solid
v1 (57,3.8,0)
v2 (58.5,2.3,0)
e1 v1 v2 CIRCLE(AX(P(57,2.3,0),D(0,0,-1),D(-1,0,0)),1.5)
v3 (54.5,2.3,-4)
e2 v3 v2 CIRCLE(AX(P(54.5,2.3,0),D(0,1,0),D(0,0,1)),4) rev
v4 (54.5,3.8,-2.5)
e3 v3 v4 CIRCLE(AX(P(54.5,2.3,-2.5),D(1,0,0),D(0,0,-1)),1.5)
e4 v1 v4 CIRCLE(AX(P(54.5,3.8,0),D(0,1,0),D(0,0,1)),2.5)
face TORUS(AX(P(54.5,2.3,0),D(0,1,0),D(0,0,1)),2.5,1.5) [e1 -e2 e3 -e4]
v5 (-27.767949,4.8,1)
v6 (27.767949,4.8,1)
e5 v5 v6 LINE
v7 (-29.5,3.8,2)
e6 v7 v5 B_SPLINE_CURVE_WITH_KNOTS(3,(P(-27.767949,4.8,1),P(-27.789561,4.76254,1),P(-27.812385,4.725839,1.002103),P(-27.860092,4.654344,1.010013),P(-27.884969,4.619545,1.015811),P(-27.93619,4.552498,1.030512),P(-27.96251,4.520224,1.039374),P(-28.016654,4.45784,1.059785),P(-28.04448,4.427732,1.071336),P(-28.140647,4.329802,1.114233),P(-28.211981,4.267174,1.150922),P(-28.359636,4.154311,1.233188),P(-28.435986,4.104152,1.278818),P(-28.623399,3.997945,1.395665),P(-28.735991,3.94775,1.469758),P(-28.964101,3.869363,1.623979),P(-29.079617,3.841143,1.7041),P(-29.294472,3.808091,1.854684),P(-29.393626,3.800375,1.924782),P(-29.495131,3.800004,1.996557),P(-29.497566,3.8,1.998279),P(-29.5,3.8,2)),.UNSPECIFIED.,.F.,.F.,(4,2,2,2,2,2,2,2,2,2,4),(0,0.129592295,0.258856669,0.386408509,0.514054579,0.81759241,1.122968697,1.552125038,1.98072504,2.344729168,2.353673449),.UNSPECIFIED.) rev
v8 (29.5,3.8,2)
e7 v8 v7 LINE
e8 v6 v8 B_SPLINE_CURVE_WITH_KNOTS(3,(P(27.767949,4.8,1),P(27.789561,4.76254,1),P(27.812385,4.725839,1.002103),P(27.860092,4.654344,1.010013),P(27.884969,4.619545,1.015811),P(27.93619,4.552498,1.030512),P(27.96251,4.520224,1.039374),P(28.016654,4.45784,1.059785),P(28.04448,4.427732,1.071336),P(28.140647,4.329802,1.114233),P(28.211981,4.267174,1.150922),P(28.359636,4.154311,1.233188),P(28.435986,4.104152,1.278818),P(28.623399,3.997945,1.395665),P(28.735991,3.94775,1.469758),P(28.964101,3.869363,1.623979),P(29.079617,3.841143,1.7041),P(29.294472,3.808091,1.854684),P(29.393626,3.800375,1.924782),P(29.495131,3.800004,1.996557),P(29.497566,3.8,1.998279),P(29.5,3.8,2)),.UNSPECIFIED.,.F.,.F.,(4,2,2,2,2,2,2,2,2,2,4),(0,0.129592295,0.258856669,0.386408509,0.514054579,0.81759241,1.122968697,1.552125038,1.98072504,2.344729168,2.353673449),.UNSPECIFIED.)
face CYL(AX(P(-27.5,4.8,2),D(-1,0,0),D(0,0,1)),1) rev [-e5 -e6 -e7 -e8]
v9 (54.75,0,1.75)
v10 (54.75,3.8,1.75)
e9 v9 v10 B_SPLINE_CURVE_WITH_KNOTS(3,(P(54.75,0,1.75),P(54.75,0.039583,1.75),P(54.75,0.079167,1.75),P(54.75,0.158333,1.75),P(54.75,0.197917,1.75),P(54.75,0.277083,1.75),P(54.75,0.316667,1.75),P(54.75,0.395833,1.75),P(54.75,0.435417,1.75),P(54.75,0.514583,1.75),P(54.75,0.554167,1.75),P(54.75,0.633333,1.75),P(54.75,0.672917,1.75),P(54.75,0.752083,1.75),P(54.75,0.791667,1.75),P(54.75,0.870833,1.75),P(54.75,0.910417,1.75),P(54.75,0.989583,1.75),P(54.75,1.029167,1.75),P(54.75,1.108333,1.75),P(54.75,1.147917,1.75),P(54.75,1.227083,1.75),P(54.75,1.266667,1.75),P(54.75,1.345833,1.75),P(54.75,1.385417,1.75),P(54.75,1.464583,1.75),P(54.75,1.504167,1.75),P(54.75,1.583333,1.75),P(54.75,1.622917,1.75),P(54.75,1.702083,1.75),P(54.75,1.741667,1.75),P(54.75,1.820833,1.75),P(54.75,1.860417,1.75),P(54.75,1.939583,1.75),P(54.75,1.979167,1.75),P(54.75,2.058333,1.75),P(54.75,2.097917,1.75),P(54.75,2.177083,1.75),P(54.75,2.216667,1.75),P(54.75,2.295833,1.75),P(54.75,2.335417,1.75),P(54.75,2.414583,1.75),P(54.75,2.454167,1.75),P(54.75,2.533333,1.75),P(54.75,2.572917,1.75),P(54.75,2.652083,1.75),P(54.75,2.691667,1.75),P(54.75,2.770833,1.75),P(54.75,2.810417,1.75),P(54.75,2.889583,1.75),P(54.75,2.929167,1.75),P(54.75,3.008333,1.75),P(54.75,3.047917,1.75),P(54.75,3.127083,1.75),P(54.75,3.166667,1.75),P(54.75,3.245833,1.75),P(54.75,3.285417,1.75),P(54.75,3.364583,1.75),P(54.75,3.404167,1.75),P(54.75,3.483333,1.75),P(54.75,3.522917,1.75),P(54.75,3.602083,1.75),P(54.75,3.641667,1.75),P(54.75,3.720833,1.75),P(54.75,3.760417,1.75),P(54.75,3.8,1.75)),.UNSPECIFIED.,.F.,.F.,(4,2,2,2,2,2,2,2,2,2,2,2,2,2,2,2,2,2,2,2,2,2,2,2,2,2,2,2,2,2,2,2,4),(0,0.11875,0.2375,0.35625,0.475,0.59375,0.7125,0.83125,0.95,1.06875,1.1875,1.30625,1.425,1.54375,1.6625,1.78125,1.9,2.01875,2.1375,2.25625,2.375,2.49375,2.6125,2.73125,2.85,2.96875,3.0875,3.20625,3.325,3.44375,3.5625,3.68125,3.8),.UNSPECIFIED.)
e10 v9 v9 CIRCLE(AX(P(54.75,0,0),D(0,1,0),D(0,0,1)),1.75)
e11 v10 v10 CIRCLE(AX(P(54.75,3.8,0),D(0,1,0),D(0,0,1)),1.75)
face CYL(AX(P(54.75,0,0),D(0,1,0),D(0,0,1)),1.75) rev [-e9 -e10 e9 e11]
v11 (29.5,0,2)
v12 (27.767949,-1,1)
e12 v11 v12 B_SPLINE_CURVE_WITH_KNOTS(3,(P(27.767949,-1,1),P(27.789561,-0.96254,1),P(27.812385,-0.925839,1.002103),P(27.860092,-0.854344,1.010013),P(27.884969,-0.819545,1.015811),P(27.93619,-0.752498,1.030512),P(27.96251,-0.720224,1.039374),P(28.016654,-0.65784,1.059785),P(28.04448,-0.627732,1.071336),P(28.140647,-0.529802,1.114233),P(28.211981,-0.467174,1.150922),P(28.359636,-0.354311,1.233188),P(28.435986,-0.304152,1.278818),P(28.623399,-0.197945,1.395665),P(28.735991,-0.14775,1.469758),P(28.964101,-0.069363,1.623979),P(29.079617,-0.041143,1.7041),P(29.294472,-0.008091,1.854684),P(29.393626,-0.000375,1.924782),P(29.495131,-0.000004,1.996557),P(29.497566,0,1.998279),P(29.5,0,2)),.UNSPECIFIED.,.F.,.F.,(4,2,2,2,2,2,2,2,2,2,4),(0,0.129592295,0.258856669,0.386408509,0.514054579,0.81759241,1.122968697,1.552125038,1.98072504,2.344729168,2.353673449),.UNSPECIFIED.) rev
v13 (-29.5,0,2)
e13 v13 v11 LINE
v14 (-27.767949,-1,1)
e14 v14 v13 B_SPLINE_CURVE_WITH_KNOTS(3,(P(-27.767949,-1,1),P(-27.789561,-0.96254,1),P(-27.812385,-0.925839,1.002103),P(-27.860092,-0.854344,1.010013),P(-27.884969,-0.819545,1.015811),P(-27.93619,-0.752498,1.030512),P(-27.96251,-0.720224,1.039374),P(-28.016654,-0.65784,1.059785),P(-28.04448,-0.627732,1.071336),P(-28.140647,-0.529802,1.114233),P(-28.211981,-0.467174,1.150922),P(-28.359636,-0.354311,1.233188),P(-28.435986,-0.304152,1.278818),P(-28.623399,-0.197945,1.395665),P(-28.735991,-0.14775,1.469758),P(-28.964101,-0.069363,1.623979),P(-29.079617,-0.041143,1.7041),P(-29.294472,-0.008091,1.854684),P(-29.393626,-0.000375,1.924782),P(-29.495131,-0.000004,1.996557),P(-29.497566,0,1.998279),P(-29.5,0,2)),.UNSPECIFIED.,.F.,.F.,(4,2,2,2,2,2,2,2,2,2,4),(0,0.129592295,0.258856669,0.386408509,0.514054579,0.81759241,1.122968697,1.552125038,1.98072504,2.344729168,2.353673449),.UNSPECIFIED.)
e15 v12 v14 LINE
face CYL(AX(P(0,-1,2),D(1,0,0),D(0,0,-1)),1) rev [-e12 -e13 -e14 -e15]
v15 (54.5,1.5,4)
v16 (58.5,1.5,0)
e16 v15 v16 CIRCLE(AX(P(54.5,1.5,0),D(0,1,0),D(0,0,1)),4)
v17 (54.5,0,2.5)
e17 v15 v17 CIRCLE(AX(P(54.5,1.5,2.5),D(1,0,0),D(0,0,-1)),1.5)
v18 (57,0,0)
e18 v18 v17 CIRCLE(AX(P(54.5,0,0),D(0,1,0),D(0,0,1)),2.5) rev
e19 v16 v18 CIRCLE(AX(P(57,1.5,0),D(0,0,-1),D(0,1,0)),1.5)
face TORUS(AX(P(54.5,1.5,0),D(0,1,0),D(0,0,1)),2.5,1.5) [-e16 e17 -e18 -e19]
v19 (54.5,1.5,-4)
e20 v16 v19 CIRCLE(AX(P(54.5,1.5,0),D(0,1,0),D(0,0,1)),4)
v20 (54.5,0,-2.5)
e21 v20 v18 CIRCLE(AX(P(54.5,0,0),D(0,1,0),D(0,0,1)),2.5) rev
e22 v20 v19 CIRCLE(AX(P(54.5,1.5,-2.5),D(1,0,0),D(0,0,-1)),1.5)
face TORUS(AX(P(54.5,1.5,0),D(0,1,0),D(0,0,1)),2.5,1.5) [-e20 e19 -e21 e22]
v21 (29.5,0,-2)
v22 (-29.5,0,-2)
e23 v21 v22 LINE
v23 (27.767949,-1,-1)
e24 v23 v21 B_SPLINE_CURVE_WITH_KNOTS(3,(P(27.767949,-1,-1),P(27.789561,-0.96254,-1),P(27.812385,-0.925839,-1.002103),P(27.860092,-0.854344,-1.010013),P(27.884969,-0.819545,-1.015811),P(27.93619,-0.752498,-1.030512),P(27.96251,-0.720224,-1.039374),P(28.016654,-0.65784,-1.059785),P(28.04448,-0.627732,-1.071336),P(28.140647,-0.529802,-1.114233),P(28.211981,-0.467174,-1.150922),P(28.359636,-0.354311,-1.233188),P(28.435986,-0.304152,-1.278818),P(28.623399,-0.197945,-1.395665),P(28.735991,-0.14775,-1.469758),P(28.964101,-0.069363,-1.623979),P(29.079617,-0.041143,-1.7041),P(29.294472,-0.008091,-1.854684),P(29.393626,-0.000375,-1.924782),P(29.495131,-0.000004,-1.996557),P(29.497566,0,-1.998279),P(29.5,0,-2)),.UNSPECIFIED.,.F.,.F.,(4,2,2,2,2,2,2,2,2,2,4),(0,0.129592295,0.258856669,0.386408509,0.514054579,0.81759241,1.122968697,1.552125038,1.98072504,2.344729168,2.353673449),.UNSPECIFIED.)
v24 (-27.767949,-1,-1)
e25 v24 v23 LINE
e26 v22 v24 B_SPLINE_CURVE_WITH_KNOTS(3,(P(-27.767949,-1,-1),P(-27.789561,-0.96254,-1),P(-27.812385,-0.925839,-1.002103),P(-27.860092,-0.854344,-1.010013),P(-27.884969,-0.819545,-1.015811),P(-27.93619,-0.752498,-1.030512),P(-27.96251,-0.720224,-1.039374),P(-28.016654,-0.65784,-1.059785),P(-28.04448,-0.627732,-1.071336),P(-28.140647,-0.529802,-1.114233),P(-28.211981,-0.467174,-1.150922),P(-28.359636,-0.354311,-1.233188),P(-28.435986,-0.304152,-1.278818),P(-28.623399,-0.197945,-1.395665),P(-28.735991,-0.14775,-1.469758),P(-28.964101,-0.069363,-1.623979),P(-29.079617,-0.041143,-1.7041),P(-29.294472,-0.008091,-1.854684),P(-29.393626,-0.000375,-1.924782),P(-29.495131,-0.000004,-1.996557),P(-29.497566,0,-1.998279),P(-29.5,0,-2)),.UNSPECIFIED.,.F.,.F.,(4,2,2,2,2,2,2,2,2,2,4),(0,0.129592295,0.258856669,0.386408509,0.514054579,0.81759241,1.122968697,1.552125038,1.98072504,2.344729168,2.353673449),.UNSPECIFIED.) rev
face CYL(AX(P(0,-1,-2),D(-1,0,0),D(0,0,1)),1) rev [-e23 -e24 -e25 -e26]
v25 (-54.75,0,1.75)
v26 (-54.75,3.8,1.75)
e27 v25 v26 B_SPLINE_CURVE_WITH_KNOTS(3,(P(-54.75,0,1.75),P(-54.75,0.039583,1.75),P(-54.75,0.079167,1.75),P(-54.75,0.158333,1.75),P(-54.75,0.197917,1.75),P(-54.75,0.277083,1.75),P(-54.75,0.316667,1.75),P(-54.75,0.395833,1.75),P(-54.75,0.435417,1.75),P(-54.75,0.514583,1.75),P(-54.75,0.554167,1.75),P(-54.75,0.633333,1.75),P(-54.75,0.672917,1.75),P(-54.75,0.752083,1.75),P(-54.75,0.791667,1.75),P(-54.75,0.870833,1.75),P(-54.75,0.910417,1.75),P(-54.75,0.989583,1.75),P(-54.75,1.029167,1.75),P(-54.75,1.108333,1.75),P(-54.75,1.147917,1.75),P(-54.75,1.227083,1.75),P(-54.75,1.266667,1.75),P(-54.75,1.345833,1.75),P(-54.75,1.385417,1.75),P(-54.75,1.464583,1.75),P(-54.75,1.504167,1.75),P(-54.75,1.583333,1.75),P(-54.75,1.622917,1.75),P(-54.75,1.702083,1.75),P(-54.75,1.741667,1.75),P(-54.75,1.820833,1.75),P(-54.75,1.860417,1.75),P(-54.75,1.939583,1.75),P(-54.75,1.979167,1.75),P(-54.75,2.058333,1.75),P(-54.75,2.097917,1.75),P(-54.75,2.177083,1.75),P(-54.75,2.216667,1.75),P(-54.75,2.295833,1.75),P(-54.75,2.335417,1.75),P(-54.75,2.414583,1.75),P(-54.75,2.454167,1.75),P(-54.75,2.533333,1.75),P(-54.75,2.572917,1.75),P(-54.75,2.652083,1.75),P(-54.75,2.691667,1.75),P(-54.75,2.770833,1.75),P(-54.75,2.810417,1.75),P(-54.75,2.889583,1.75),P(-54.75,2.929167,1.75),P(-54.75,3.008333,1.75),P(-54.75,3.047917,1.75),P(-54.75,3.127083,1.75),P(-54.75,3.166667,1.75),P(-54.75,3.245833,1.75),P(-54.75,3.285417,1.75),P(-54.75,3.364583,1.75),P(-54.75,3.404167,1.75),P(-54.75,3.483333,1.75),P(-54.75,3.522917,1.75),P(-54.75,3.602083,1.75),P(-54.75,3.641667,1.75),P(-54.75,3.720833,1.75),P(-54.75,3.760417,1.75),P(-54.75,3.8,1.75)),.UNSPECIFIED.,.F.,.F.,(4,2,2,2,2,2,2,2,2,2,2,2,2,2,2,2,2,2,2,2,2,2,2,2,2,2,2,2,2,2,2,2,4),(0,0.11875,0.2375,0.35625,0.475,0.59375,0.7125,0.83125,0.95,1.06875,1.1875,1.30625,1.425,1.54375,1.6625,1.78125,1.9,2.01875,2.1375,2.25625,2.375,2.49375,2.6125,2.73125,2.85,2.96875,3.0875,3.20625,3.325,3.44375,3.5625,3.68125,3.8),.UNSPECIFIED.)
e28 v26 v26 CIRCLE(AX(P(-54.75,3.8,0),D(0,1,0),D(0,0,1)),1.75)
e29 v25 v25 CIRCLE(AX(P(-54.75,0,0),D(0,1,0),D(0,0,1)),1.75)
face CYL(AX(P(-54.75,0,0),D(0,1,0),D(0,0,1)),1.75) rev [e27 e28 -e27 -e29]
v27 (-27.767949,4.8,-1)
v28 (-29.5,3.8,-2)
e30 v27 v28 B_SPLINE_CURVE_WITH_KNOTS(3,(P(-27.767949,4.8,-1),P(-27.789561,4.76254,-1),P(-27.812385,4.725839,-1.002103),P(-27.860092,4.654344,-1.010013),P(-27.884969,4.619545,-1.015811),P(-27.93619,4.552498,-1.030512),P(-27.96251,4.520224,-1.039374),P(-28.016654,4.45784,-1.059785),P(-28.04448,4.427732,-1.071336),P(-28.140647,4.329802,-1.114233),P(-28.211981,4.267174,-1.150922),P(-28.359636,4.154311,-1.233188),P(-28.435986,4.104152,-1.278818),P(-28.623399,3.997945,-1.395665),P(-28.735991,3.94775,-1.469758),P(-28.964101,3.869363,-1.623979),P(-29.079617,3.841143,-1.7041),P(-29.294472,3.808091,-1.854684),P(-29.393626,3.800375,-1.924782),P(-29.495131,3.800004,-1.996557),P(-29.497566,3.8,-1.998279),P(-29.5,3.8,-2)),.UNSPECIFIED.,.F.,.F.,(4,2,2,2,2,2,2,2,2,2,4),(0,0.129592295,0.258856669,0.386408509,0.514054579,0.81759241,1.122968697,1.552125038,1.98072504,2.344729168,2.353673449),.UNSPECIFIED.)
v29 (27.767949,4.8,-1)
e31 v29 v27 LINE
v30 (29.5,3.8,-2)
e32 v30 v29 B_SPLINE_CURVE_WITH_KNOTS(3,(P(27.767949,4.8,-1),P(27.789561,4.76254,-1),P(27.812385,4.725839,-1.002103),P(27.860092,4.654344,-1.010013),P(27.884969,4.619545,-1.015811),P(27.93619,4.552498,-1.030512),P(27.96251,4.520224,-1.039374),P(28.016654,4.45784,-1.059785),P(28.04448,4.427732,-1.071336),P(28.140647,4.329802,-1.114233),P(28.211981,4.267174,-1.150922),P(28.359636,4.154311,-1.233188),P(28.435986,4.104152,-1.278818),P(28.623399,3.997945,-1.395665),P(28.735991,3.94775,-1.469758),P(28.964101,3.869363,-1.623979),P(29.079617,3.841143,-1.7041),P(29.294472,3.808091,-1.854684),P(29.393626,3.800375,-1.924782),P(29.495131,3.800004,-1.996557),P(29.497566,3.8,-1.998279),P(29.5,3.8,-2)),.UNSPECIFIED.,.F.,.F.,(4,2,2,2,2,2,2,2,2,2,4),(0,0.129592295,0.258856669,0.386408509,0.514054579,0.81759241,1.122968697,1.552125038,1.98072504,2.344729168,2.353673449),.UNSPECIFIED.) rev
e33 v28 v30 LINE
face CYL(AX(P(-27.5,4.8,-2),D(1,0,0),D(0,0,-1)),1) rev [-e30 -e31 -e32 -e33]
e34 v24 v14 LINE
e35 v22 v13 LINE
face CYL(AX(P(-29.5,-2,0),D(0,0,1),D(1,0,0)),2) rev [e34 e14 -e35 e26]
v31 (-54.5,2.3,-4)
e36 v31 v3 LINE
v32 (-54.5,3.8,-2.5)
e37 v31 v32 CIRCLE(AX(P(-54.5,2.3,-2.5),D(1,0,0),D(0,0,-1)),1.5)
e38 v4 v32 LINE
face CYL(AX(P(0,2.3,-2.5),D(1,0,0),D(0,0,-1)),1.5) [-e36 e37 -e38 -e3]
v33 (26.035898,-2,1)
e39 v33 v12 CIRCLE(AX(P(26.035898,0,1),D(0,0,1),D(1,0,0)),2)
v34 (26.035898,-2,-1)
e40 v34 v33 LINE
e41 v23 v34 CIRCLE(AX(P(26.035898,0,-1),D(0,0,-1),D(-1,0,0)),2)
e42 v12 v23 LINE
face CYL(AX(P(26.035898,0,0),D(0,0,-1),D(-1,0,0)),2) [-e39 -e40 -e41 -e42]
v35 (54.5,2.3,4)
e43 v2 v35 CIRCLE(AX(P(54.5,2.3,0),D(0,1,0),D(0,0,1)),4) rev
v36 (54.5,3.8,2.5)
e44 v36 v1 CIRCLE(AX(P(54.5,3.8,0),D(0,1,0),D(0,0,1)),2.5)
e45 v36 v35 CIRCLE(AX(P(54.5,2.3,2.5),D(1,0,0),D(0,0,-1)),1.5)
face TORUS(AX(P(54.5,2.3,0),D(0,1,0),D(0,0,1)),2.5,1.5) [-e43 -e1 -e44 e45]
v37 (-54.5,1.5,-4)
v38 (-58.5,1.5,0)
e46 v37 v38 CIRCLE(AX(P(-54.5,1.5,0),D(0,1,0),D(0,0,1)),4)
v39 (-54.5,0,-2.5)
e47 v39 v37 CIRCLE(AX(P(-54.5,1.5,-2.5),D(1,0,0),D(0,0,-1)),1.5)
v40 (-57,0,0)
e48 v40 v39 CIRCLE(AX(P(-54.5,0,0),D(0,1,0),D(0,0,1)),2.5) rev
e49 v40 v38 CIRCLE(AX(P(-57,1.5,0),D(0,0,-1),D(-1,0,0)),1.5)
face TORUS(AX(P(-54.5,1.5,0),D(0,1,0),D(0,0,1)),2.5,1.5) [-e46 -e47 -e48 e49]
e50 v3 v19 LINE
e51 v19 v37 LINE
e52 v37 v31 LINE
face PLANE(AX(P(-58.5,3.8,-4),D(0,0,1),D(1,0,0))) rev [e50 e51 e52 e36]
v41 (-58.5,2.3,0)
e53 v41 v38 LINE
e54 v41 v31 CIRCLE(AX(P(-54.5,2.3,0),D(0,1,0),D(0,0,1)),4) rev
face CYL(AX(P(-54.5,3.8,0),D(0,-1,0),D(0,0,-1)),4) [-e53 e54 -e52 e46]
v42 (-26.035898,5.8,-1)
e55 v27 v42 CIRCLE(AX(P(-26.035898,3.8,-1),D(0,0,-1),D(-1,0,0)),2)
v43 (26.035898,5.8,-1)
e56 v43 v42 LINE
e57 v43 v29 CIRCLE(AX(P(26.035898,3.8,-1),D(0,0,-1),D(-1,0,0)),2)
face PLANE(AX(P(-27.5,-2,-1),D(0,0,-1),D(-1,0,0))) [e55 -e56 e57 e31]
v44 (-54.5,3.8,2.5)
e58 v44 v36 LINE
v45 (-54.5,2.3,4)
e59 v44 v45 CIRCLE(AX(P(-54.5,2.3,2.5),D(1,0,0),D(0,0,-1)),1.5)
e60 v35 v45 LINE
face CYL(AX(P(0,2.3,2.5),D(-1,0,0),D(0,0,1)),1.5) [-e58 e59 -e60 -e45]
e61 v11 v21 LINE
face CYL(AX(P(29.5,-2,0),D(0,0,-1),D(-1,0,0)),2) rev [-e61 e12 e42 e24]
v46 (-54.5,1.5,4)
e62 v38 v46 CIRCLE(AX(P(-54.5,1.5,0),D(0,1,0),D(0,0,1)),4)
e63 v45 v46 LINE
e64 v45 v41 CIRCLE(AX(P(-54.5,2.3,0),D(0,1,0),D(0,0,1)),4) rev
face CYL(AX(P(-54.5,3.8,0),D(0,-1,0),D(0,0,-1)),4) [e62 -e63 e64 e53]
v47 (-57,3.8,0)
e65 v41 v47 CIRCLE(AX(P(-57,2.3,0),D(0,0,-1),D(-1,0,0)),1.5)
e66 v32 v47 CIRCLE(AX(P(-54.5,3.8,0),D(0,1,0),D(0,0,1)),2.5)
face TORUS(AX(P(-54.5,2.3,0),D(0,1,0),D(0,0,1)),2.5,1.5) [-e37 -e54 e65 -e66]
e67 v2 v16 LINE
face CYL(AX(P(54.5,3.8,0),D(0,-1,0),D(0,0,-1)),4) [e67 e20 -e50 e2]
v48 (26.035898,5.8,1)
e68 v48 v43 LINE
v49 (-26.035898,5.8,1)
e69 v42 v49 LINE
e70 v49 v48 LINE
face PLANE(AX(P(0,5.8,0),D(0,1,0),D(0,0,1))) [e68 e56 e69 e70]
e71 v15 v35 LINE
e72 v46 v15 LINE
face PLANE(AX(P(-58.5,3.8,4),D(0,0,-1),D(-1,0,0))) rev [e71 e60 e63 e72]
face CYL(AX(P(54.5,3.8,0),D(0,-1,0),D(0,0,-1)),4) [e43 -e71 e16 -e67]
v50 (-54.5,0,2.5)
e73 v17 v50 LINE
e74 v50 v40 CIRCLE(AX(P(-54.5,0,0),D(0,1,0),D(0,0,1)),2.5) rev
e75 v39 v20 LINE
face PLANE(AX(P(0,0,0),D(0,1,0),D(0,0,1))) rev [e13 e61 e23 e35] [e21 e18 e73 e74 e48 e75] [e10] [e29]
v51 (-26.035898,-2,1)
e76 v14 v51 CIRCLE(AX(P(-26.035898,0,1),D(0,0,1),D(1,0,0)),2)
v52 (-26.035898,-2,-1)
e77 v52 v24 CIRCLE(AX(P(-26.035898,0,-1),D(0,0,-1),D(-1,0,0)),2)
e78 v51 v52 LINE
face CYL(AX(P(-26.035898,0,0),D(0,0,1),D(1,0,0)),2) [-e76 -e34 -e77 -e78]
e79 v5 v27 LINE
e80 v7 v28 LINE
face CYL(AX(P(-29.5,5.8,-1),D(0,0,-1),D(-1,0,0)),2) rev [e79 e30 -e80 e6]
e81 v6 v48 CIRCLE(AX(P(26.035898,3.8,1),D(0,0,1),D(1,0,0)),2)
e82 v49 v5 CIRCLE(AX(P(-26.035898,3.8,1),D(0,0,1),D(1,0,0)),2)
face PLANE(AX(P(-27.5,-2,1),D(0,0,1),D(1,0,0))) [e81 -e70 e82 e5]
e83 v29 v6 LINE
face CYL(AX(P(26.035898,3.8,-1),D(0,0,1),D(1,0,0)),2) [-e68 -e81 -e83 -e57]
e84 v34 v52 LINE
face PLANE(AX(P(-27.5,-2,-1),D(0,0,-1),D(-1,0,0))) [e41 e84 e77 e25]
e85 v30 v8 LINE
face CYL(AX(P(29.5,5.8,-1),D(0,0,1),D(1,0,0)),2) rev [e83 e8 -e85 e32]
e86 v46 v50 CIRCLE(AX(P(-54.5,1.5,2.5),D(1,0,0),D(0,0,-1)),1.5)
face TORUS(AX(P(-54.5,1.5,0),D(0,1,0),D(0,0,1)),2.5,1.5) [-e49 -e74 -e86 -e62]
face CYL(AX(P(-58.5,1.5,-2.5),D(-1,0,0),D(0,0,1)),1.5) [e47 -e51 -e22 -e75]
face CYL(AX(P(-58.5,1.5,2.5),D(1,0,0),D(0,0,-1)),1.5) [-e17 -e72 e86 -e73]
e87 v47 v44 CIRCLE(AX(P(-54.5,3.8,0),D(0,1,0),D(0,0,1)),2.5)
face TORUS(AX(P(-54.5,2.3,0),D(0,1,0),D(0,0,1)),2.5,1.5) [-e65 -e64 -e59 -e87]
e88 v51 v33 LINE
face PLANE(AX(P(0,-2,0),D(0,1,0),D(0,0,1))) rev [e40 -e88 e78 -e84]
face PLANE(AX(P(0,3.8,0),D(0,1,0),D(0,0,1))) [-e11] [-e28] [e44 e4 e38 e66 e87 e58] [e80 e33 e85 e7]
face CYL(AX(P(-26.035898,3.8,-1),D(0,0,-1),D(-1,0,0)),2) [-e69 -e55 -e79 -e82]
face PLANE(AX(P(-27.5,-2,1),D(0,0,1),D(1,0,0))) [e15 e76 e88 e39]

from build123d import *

# Parameters (mm, degrees)
SKETCH1_W                = 117
SKETCH1_H                = 8
BOSS_EXTRUDE1_DEPTH      = 3.8
SKETCH2_R                = 1.75
CUT_EXTRUDE4_DEPTH       = 59.759594961
FILLET1_R                = 4
FILLET2_R                = 1.5
BOSS_EXTRUDE2_DEPTH      = 2
BOSS_EXTRUDE2_DEPTH_BACK = 5.8
SKETCH3_W                = 55
SKETCH3_H                = 2
FILLET3_R                = 2
FILLET4_R                = 2
FILLET5_R                = 1


with BuildPart() as part:
    # Sketch1 → Boss-Extrude1 (new body)
    with BuildSketch(Plane(origin=(0, 0, 0), x_dir=(1, 0, 0), z_dir=(0, 1, 0))):
        Rectangle(SKETCH1_W, SKETCH1_H)
    extrude(amount=BOSS_EXTRUDE1_DEPTH)

    # Sketch2 → Cut-Extrude4 (cut, through all)
    with BuildSketch(Plane(origin=(0, 3.8, 0), x_dir=(1, 0, 0), z_dir=(0, 1, 0))):
        with Locations(Location((-54.75, 0, 0), (0, 0, 270))):
            Circle(SKETCH2_R)
        with Locations(Location((54.75, 0, 0), (0, 0, 270))):
            Circle(SKETCH2_R)
    extrude(amount=-CUT_EXTRUDE4_DEPTH, mode=Mode.SUBTRACT)

    # Fillet1
    fillet1_edges = [part.edges().sort_by_distance(p)[0] for p in [
        (58.5, 1.9, -4),
        (58.5, 1.9, 4),
        (-58.5, 1.9, 4),
        (-58.5, 1.9, -4),
    ]]
    fillet(fillet1_edges, radius=FILLET1_R - 0.0001)  # a hair under: the kernel refuses the full size

    # Fillet2
    fillet2_edges = [part.edges().sort_by_distance(p)[0] for p in [
        (0, 0, -4),
        (0, 3.8, -4),
        (0, 0, 4),
        (-57.328456414, 0, -2.828456414),
        (-57.328456414, 0, 2.828456414),
        (57.328456414, 0, 2.828456414),
        (57.328456414, 0, -2.828456414),
        (0, 3.8, 4),
        (-57.328456414, 3.8, -2.828456414),
        (-57.328456414, 3.8, 2.828456414),
        (57.328456414, 3.8, 2.828456414),
        (57.328456414, 3.8, -2.828456414),
    ]]
    fillet(fillet2_edges, radius=FILLET2_R)

    # Sketch3 → Boss-Extrude2 (add, two sides: drawn at the far end of the back side and taken through both)
    with BuildSketch(Plane(origin=(0, 3.8, 0), x_dir=(1, 0, 0), z_dir=(0, 1, 0)).offset(-BOSS_EXTRUDE2_DEPTH_BACK)):
        Rectangle(SKETCH3_W, SKETCH3_H)
    extrude(amount=BOSS_EXTRUDE2_DEPTH + BOSS_EXTRUDE2_DEPTH_BACK)

    # Fillet3
    fillet3_edges = [part.edges().sort_by_distance(p)[0] for p in [
        (-27.5, 0, 0),
        (27.5, 0, 0),
        (-27.5, 3.8, 0),
        (27.5, 3.8, 0),
    ]]
    fillet(fillet3_edges, radius=FILLET3_R - 0.0001)  # a hair under: the kernel refuses the full size

    # Fillet4
    fillet4_edges = [part.edges().sort_by_distance(p)[0] for p in [
        (27.5, -2, 0),
        (-27.5, -2, 0),
        (27.5, 5.8, 0),
        (-27.5, 5.8, 0),
    ]]
    fillet(fillet4_edges, radius=FILLET4_R)

    # Fillet5
    fillet5_edges = [part.edges().sort_by_distance(p)[0] for p in [
        (0, 3.8, -1),
        (0, 3.8, 1),
        (0, 0, 1),
        (0, 0, -1),
    ]]
    fillet(fillet5_edges, radius=FILLET5_R - 0.0001)  # a hair under: the kernel refuses the full size


solid = part.part
